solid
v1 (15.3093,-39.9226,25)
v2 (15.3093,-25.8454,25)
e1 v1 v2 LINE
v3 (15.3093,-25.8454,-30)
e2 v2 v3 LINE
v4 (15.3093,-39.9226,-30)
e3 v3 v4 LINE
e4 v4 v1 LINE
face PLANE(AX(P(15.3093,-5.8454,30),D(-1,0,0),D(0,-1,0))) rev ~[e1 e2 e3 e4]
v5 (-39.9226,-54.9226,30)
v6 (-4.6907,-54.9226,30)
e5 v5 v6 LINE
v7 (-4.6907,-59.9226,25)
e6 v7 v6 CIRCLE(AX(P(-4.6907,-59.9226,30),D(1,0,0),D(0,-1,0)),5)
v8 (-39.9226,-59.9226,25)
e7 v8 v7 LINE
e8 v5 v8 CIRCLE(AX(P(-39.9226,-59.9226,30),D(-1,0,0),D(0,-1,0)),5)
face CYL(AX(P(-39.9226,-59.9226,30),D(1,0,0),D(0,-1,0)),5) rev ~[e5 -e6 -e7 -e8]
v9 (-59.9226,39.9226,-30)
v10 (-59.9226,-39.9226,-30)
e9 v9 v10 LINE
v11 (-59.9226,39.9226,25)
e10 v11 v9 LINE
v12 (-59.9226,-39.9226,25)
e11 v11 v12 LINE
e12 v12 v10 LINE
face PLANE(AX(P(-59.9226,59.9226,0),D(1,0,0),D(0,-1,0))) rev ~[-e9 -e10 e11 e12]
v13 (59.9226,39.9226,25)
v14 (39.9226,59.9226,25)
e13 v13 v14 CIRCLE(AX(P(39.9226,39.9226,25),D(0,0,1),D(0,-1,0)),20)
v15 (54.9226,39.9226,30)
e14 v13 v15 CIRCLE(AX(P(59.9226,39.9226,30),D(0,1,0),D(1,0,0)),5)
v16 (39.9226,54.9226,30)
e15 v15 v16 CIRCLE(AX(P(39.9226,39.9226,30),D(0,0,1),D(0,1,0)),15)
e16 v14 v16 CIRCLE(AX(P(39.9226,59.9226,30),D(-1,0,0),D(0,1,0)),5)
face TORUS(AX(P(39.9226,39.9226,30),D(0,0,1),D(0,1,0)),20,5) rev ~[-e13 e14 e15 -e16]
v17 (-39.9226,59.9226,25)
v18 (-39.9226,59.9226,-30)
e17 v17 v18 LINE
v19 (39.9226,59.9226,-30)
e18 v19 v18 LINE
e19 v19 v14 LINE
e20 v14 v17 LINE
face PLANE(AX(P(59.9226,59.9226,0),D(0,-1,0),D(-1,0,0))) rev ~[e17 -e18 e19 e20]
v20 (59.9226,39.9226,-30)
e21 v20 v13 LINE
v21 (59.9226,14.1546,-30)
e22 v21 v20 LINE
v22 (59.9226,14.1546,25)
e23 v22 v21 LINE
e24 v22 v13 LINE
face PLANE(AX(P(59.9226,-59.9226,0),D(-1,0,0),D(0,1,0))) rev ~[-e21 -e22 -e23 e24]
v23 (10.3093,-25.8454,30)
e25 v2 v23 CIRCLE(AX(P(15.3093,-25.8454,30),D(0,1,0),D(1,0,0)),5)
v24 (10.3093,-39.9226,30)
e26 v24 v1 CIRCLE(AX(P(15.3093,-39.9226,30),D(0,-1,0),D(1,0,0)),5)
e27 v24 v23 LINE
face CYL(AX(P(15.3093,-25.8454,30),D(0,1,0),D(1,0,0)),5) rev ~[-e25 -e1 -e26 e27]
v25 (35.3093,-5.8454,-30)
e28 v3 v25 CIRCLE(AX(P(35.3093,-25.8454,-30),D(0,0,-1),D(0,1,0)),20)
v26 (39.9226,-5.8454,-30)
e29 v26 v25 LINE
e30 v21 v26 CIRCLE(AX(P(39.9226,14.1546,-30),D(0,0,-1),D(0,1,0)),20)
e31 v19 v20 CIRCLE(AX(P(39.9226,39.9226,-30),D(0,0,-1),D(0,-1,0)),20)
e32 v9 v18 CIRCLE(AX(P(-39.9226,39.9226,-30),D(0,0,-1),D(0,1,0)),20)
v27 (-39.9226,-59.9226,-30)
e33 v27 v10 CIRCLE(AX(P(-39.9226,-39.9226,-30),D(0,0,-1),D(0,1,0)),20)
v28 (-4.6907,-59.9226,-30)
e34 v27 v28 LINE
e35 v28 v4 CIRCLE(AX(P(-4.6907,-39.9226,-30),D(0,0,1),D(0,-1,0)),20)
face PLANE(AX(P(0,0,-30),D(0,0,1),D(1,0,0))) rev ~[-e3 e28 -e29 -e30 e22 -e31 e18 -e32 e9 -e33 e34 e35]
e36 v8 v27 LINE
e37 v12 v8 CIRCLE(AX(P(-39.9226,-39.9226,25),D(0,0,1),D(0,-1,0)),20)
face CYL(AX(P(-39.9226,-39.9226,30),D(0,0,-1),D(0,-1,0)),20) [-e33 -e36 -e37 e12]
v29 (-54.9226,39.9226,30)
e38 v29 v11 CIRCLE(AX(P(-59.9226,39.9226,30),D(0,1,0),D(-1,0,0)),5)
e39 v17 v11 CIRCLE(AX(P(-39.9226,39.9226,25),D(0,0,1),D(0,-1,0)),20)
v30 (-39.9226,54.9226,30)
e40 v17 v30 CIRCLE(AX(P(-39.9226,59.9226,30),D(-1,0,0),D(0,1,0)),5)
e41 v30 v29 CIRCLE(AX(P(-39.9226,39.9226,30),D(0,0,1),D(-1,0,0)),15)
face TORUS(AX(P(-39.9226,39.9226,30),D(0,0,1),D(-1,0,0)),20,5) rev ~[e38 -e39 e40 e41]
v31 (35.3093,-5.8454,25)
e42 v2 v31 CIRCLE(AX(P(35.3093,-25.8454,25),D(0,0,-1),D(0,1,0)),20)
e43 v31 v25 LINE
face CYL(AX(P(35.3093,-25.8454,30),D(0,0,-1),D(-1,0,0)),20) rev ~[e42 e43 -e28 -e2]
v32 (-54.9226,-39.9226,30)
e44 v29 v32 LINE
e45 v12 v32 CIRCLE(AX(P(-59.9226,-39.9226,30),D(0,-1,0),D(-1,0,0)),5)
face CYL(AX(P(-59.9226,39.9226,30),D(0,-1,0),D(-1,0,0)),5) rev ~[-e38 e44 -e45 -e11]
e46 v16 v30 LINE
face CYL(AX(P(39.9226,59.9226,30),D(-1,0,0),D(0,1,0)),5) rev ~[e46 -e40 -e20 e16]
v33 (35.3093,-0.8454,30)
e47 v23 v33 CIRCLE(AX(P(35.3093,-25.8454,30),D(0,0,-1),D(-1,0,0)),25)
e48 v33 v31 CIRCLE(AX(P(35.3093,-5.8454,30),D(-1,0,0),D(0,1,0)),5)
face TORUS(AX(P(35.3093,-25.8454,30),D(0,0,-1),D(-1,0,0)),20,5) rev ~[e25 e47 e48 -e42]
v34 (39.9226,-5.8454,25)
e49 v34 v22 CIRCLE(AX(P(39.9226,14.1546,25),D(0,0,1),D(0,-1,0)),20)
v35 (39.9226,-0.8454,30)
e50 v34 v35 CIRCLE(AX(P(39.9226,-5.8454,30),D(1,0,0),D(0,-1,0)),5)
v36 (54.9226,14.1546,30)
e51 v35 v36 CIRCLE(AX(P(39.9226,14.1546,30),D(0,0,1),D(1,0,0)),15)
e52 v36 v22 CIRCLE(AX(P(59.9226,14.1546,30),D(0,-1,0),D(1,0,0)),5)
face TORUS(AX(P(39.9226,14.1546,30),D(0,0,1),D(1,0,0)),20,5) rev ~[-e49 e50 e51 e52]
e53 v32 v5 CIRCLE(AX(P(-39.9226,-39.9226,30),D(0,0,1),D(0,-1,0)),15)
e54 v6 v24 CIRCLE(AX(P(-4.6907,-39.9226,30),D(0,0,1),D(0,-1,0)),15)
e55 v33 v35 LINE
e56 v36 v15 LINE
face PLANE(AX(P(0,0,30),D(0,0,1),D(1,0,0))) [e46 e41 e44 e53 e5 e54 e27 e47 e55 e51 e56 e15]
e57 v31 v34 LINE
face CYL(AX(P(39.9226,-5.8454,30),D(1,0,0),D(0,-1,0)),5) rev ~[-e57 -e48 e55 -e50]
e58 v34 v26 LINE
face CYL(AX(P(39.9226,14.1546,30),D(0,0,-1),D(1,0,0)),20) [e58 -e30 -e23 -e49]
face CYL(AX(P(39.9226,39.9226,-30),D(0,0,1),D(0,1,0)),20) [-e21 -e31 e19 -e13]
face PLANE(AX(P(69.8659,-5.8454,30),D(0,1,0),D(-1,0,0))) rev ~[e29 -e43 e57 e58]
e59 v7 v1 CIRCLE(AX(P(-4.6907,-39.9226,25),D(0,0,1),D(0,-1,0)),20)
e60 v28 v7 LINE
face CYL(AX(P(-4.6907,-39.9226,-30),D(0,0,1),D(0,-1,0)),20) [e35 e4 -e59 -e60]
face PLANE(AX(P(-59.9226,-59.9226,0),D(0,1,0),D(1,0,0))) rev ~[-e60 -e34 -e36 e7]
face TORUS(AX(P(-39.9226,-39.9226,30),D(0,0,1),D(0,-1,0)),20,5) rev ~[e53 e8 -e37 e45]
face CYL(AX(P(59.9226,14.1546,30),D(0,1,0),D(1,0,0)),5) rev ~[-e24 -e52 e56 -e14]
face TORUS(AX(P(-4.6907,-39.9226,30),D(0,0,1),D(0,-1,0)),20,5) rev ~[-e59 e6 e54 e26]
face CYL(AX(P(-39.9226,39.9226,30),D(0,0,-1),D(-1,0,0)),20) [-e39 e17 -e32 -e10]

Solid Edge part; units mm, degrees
sketch "Sketch1" plane through (0, 0, 0) normal (0, 0, 1) x (1, 0, 0)
  line L0 (-59.9226, -59.9226) -> (59.9226, -59.9226)
  line L1 (59.9226, -59.9226) -> (59.9226, 59.9226)
  line L2 (59.9226, 59.9226) -> (-59.9226, 59.9226)
  line L3 (-59.9226, 59.9226) -> (-59.9226, -59.9226)
extrude "Protrusion1" add sketch "Sketch1" along normal mid plane 60
sketch "Sketch2" plane through (0, 0, 30) normal (0, 0, 1) x (1, 0, 0)
  line L0 (69.8659, -5.8454) -> (15.3093, -5.8454)
  line L1 (15.3093, -5.8454) -> (15.3093, -68.7525)
extrude "Cutout1" cut sketch "Sketch2" against normal through all material side at (42.5876, -5.8954, 30)
fillet "Round_1" radius 20 6 edges at (-59.9226, -59.9226, 0) (-59.9226, 59.9226, 0) (15.3093, -5.8454, 0) (15.3093, -59.9226, 0) (59.9226, -5.8454, 0) (59.9226, 59.9226, 0)
sketch "Sketch3" plane through (15.3093, -39.9226, 30) normal (0, -1, 0) x (1, 0, 0)
  circle A0 centre (0, 0) radius 5
  dimension "D1" = 10
sketch3d "SweptCutout1 path"
  arc A0 (-4.6907, -59.9226, 30) -> (15.3093, -39.9226, 30) centre (-4.6907, -39.9226, 30)
  line L1 (15.3093, -25.8454, 30) -> (15.3093, -39.9226, 30)
  arc A2 (15.3093, -25.8454, 30) -> (35.3093, -5.8454, 30) centre (35.3093, -25.8454, 30)
  line L3 (39.9226, -5.8454, 30) -> (35.3093, -5.8454, 30)
  arc A4 (59.9226, 14.1546, 30) -> (39.9226, -5.8454, 30) centre (39.9226, 14.1546, 30)
  line L5 (59.9226, 14.1546, 30) -> (59.9226, 39.9226, 30)
  arc A6 (39.9226, 59.9226, 30) -> (59.9226, 39.9226, 30) centre (39.9226, 39.9226, 30)
  line L7 (39.9226, 59.9226, 30) -> (-39.9226, 59.9226, 30)
  arc A8 (-59.9226, 39.9226, 30) -> (-39.9226, 59.9226, 30) centre (-39.9226, 39.9226, 30)
  line L9 (-59.9226, 39.9226, 30) -> (-59.9226, -39.9226, 30)
  arc A10 (-39.9226, -59.9226, 30) -> (-59.9226, -39.9226, 30) centre (-39.9226, -39.9226, 30)
  line L11 (-39.9226, -59.9226, 30) -> (-4.6907, -59.9226, 30)
sweep "SweptCutout1" cut profiles "Sketch3" path "SweptCutout1 path"
